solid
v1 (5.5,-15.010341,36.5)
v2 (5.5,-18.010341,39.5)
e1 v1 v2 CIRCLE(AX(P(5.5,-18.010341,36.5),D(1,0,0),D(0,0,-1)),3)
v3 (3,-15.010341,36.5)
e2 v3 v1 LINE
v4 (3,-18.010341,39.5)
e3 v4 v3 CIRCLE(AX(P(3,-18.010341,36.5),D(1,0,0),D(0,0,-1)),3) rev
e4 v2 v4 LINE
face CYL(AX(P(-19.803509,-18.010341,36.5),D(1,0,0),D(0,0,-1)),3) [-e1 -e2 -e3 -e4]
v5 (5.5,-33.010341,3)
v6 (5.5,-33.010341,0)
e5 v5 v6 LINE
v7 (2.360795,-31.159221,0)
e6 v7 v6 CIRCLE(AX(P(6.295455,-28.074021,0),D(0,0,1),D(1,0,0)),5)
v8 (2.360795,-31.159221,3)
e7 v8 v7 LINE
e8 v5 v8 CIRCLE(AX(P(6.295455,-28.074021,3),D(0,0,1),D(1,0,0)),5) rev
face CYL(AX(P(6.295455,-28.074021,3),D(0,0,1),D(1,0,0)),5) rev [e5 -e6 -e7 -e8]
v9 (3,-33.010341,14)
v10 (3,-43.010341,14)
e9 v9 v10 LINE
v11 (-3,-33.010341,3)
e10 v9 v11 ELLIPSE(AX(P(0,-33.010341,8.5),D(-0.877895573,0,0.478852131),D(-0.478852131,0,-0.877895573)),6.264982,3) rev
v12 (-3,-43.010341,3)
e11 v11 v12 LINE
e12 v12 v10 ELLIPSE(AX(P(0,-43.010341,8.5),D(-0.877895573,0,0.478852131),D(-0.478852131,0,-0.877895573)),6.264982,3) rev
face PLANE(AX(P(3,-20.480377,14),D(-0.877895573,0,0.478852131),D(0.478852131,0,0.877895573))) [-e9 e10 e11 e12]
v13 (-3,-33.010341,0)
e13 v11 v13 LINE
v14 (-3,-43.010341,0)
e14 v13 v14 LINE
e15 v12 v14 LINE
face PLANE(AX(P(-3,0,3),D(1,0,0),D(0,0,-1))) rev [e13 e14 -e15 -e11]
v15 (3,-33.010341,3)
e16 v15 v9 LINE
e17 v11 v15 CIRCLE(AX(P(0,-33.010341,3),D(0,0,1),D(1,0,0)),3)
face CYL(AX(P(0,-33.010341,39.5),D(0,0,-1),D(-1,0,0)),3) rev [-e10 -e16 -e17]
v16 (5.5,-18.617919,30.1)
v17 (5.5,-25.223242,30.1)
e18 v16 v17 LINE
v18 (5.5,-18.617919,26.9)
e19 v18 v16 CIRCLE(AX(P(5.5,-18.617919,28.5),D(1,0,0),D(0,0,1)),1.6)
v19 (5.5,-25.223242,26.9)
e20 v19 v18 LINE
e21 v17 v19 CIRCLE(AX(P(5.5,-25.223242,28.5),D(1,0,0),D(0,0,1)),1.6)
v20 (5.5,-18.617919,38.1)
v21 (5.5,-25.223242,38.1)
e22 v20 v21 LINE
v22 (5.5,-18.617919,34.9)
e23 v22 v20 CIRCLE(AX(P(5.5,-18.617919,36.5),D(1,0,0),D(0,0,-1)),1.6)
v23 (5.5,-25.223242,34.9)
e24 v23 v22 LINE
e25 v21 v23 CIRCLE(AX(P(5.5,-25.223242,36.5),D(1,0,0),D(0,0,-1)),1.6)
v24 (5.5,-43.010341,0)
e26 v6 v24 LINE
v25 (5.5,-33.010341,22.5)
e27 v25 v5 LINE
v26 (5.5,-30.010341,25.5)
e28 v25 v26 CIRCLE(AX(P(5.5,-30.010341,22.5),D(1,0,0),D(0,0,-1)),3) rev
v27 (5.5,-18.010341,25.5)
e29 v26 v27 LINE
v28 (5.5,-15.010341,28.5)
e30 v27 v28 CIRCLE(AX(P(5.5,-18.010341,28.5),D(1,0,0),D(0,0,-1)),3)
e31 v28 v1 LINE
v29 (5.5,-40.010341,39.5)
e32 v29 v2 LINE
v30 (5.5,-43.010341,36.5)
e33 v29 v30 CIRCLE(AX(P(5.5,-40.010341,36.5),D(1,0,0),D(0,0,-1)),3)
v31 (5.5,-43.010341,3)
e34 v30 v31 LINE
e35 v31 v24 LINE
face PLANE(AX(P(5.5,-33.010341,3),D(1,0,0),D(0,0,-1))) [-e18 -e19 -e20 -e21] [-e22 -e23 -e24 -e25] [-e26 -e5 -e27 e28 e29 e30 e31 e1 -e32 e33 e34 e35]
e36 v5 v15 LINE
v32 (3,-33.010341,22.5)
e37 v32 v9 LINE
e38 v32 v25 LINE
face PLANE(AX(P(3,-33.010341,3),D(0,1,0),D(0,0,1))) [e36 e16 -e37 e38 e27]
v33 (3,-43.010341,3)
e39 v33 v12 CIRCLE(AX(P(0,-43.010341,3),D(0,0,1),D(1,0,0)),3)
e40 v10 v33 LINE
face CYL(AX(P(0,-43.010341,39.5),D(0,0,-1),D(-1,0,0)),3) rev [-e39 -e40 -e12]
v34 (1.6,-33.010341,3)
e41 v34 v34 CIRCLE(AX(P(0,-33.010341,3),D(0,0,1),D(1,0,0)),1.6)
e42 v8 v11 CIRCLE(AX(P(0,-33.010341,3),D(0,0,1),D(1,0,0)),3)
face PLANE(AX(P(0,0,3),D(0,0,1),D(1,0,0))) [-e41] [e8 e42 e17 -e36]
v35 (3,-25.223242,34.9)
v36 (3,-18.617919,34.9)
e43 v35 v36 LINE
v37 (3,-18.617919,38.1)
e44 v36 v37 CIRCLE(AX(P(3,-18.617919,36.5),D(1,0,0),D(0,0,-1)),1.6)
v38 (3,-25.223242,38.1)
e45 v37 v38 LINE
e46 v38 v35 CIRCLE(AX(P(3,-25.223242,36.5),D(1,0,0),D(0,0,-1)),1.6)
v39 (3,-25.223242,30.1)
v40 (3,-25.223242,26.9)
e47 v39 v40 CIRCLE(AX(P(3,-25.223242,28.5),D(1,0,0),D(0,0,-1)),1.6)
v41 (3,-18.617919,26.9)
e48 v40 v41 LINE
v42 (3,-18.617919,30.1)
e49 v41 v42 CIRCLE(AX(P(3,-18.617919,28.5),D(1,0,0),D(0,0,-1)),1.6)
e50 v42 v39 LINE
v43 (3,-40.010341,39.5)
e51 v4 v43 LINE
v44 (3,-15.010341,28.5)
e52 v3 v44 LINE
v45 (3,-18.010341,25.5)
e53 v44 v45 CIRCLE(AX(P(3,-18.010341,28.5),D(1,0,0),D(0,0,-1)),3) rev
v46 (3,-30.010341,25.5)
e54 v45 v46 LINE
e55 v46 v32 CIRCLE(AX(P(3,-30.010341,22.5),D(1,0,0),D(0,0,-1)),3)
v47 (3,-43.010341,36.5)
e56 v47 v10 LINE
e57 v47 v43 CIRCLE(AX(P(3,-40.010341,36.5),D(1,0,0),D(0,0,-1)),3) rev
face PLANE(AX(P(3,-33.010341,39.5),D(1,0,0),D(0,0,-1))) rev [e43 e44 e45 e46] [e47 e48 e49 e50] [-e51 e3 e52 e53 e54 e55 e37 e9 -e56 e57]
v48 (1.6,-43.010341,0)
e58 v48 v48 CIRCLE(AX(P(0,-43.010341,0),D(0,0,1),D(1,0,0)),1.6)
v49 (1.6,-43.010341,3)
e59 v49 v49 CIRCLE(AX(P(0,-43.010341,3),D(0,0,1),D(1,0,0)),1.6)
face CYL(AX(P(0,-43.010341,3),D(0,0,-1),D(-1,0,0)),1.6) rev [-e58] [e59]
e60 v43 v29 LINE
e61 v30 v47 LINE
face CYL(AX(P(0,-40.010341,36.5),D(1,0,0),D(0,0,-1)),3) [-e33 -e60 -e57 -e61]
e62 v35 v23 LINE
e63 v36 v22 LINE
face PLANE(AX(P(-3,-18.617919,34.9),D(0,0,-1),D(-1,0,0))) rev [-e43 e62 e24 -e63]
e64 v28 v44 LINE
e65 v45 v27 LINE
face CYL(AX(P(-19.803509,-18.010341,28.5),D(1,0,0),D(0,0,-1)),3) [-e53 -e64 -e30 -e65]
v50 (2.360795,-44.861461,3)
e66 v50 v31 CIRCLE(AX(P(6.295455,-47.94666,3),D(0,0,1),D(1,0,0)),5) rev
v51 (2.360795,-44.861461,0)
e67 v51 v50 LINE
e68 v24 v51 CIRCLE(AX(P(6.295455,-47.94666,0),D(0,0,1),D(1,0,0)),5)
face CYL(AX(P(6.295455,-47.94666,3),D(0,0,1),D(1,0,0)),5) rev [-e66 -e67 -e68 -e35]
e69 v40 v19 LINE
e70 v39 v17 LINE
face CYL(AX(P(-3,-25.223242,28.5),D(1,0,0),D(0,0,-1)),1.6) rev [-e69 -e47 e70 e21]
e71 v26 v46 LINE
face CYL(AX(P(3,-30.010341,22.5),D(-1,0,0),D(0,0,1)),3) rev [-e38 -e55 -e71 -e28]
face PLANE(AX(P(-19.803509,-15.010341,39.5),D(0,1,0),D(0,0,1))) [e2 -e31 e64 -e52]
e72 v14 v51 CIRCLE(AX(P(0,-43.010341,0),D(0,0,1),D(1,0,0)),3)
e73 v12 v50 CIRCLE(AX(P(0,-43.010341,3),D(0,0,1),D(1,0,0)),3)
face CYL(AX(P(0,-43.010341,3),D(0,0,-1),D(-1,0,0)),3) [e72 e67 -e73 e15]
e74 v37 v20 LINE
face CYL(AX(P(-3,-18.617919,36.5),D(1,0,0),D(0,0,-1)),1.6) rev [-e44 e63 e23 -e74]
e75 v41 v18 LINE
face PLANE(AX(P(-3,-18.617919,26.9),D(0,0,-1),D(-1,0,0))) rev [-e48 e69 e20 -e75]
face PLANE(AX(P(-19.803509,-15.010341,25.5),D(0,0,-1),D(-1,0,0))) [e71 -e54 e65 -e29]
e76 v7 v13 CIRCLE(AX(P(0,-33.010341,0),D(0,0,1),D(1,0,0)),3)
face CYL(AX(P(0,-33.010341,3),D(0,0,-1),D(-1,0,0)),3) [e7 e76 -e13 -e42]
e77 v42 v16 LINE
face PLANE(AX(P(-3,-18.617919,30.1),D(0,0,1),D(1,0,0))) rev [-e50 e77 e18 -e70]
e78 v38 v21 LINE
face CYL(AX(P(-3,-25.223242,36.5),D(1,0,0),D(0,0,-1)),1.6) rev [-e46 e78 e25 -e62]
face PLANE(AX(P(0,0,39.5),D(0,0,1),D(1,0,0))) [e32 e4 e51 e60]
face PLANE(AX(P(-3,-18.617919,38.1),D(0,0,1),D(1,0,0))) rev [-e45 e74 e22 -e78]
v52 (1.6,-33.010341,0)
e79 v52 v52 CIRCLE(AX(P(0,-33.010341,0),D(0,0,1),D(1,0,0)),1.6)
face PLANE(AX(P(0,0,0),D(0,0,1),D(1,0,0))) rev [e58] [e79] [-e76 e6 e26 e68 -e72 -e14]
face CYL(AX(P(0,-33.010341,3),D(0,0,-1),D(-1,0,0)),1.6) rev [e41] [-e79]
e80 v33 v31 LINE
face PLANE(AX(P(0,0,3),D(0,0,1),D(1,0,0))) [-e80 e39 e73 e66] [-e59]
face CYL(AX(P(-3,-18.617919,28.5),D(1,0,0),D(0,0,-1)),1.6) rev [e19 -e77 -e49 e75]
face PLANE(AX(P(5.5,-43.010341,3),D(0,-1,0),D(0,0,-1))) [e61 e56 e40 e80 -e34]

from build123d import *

# Parameters (mm, degrees)
SKETCH_1_R          = 1.6
EXTRUDE_1_DEPTH     = 3
SKETCH_3_W          = 2.5
SKETCH_3_H          = 10
EXTRUDE_2_DEPTH     = 36.5
FILLET_1_R          = 5
FILLET_2_R          = 5
SKETCH_4_W          = 14
SKETCH_4_H          = 18
EXTRUDE_3_DEPTH     = 2.5
CUT_EXTRUDE_1_DEPTH = 62.232764559
EXTRUDE_4_DEPTH     = 10
SKETCH_8_R          = 3
CUT_EXTRUDE_2_DEPTH = 59.986875282
FILLET_3_R          = 3


with BuildPart() as part:
    # 草图1 → 凸台-拉伸1 (new body)
    with BuildSketch(Plane.XY):
        with BuildLine():
            ThreePointArc((3, -33.010340746), (0, -30.010340746), (-3, -33.010340746))
            Line((-3, -33.010340746), (-3, -43.010340746))
            ThreePointArc((-3, -43.010340746), (0, -46.010340746), (3, -43.010340746))
            Line((3, -43.010340746), (5.5, -43.010340746))
            Line((5.5, -43.010340746), (5.5, -33.010340746))
            Line((5.5, -33.010340746), (3, -33.010340746))
        make_face()
        with Locations((0, -33.010340746)):
            Circle(SKETCH_1_R, mode=Mode.SUBTRACT)
        with Locations((0, -43.010340746)):
            Circle(SKETCH_1_R, mode=Mode.SUBTRACT)
    extrude(amount=EXTRUDE_1_DEPTH)

    # 草图3 → 凸台-拉伸2 (add)
    with BuildSketch(Plane.XY.offset(3)):
        with Locations((4.25, -38.010340746)):
            Rectangle(SKETCH_3_W, SKETCH_3_H)
    extrude(amount=EXTRUDE_2_DEPTH)

    # 圆角1
    # the kernel refuses this fillet: 5 mm, written as the material it adds along each edge
    with BuildSketch(Plane(origin=(3, -43.010340746, 0), x_dir=(-0.32639560491693326, -0.9452332564456825, 0), z_dir=(0, 0, 1))) as fillet_1_piece_1:
        with BuildLine():
            CenterArc((3.590351654, 4.726166282), FILLET_1_R, 208.20428203, 42.745569225)
            Line((-0.815989012, 2.363083141), (0, 0))
            ThreePointArc((0, 0), (0.979186815, 0.164300231), (1.95837363, 0))
        make_face()
    extrude(amount=3)

    # 圆角2
    # the kernel refuses this fillet: 5 mm, written as the material it adds along each edge
    with BuildSketch(Plane(origin=(3, -33.010340746, 0), x_dir=(1, 0, 0), z_dir=(0, 0, 1))) as fillet_2_piece_1:
        with BuildLine():
            CenterArc((3.295454545, 4.936319688), FILLET_2_R, 218.100297491, 42.745569225)
            ThreePointArc((-0.639204545, 1.851119883), (-0.164300231, 0.979186815), (0, 0))
            Line((0, 0), (2.5, 0))
        make_face()
    extrude(amount=3)

    # 草图4 → 凸台-拉伸3 (add)
    with BuildSketch(Plane(origin=(5.5, 0, 0), x_dir=(0, 0, -1), z_dir=(1, 0, 0))):
        with Locations((-32.5, -24.010340746)):
            Rectangle(SKETCH_4_W, SKETCH_4_H)
    extrude(amount=-EXTRUDE_3_DEPTH)

    # 草图5 → 切除-拉伸1 (cut, through all)
    with BuildSketch(Plane(origin=(5.5, 0, 0), x_dir=(0, 0, -1), z_dir=(1, 0, 0))):
        with BuildLine():
            Line((-34.9, -18.617918523), (-34.9, -25.223242404))
            ThreePointArc((-34.9, -25.223242404), (-36.5, -26.823242404), (-38.1, -25.223242404))
            Line((-38.1, -25.223242404), (-38.1, -18.617918523))
            ThreePointArc((-38.1, -18.617918523), (-36.5, -17.017918523), (-34.9, -18.617918523))
        make_face()
        with BuildLine():
            Line((-30.1, -18.617918523), (-30.1, -25.223242404))
            ThreePointArc((-30.1, -25.223242404), (-28.5, -26.823242404), (-26.9, -25.223242404))
            Line((-26.9, -25.223242404), (-26.9, -18.617918523))
            ThreePointArc((-26.9, -18.617918523), (-28.5, -17.017918523), (-30.1, -18.617918523))
        make_face()
    extrude(amount=-CUT_EXTRUDE_1_DEPTH, mode=Mode.SUBTRACT)

    # 草图6 → 凸台-拉伸4 (add)
    with BuildSketch(Plane.XZ.offset(43.010340746)):
        Polygon((3, 14), (-3, 3), (3, 3), align=None)
    extrude(amount=-EXTRUDE_4_DEPTH)

    # 草图8 → 切除-拉伸2 (cut, through all)
    with BuildSketch(Plane.XY.offset(3)):
        with Locations((0, -43.010340746)):
            Circle(SKETCH_8_R)
        with Locations((0, -33.010340746)):
            Circle(SKETCH_8_R)
    extrude(amount=CUT_EXTRUDE_2_DEPTH, mode=Mode.SUBTRACT)

    # 圆角3
    fillet_3_edges = [part.edges().sort_by_distance(p)[0] for p in [
        (4.25, -43.010340746, 39.5),
        (4.25, -33.010340746, 25.5),
        (4.25, -15.010340746, 39.5),
        (4.25, -15.010340746, 25.5),
    ]]
    fillet(fillet_3_edges, radius=FILLET_3_R)


solid = part.part
